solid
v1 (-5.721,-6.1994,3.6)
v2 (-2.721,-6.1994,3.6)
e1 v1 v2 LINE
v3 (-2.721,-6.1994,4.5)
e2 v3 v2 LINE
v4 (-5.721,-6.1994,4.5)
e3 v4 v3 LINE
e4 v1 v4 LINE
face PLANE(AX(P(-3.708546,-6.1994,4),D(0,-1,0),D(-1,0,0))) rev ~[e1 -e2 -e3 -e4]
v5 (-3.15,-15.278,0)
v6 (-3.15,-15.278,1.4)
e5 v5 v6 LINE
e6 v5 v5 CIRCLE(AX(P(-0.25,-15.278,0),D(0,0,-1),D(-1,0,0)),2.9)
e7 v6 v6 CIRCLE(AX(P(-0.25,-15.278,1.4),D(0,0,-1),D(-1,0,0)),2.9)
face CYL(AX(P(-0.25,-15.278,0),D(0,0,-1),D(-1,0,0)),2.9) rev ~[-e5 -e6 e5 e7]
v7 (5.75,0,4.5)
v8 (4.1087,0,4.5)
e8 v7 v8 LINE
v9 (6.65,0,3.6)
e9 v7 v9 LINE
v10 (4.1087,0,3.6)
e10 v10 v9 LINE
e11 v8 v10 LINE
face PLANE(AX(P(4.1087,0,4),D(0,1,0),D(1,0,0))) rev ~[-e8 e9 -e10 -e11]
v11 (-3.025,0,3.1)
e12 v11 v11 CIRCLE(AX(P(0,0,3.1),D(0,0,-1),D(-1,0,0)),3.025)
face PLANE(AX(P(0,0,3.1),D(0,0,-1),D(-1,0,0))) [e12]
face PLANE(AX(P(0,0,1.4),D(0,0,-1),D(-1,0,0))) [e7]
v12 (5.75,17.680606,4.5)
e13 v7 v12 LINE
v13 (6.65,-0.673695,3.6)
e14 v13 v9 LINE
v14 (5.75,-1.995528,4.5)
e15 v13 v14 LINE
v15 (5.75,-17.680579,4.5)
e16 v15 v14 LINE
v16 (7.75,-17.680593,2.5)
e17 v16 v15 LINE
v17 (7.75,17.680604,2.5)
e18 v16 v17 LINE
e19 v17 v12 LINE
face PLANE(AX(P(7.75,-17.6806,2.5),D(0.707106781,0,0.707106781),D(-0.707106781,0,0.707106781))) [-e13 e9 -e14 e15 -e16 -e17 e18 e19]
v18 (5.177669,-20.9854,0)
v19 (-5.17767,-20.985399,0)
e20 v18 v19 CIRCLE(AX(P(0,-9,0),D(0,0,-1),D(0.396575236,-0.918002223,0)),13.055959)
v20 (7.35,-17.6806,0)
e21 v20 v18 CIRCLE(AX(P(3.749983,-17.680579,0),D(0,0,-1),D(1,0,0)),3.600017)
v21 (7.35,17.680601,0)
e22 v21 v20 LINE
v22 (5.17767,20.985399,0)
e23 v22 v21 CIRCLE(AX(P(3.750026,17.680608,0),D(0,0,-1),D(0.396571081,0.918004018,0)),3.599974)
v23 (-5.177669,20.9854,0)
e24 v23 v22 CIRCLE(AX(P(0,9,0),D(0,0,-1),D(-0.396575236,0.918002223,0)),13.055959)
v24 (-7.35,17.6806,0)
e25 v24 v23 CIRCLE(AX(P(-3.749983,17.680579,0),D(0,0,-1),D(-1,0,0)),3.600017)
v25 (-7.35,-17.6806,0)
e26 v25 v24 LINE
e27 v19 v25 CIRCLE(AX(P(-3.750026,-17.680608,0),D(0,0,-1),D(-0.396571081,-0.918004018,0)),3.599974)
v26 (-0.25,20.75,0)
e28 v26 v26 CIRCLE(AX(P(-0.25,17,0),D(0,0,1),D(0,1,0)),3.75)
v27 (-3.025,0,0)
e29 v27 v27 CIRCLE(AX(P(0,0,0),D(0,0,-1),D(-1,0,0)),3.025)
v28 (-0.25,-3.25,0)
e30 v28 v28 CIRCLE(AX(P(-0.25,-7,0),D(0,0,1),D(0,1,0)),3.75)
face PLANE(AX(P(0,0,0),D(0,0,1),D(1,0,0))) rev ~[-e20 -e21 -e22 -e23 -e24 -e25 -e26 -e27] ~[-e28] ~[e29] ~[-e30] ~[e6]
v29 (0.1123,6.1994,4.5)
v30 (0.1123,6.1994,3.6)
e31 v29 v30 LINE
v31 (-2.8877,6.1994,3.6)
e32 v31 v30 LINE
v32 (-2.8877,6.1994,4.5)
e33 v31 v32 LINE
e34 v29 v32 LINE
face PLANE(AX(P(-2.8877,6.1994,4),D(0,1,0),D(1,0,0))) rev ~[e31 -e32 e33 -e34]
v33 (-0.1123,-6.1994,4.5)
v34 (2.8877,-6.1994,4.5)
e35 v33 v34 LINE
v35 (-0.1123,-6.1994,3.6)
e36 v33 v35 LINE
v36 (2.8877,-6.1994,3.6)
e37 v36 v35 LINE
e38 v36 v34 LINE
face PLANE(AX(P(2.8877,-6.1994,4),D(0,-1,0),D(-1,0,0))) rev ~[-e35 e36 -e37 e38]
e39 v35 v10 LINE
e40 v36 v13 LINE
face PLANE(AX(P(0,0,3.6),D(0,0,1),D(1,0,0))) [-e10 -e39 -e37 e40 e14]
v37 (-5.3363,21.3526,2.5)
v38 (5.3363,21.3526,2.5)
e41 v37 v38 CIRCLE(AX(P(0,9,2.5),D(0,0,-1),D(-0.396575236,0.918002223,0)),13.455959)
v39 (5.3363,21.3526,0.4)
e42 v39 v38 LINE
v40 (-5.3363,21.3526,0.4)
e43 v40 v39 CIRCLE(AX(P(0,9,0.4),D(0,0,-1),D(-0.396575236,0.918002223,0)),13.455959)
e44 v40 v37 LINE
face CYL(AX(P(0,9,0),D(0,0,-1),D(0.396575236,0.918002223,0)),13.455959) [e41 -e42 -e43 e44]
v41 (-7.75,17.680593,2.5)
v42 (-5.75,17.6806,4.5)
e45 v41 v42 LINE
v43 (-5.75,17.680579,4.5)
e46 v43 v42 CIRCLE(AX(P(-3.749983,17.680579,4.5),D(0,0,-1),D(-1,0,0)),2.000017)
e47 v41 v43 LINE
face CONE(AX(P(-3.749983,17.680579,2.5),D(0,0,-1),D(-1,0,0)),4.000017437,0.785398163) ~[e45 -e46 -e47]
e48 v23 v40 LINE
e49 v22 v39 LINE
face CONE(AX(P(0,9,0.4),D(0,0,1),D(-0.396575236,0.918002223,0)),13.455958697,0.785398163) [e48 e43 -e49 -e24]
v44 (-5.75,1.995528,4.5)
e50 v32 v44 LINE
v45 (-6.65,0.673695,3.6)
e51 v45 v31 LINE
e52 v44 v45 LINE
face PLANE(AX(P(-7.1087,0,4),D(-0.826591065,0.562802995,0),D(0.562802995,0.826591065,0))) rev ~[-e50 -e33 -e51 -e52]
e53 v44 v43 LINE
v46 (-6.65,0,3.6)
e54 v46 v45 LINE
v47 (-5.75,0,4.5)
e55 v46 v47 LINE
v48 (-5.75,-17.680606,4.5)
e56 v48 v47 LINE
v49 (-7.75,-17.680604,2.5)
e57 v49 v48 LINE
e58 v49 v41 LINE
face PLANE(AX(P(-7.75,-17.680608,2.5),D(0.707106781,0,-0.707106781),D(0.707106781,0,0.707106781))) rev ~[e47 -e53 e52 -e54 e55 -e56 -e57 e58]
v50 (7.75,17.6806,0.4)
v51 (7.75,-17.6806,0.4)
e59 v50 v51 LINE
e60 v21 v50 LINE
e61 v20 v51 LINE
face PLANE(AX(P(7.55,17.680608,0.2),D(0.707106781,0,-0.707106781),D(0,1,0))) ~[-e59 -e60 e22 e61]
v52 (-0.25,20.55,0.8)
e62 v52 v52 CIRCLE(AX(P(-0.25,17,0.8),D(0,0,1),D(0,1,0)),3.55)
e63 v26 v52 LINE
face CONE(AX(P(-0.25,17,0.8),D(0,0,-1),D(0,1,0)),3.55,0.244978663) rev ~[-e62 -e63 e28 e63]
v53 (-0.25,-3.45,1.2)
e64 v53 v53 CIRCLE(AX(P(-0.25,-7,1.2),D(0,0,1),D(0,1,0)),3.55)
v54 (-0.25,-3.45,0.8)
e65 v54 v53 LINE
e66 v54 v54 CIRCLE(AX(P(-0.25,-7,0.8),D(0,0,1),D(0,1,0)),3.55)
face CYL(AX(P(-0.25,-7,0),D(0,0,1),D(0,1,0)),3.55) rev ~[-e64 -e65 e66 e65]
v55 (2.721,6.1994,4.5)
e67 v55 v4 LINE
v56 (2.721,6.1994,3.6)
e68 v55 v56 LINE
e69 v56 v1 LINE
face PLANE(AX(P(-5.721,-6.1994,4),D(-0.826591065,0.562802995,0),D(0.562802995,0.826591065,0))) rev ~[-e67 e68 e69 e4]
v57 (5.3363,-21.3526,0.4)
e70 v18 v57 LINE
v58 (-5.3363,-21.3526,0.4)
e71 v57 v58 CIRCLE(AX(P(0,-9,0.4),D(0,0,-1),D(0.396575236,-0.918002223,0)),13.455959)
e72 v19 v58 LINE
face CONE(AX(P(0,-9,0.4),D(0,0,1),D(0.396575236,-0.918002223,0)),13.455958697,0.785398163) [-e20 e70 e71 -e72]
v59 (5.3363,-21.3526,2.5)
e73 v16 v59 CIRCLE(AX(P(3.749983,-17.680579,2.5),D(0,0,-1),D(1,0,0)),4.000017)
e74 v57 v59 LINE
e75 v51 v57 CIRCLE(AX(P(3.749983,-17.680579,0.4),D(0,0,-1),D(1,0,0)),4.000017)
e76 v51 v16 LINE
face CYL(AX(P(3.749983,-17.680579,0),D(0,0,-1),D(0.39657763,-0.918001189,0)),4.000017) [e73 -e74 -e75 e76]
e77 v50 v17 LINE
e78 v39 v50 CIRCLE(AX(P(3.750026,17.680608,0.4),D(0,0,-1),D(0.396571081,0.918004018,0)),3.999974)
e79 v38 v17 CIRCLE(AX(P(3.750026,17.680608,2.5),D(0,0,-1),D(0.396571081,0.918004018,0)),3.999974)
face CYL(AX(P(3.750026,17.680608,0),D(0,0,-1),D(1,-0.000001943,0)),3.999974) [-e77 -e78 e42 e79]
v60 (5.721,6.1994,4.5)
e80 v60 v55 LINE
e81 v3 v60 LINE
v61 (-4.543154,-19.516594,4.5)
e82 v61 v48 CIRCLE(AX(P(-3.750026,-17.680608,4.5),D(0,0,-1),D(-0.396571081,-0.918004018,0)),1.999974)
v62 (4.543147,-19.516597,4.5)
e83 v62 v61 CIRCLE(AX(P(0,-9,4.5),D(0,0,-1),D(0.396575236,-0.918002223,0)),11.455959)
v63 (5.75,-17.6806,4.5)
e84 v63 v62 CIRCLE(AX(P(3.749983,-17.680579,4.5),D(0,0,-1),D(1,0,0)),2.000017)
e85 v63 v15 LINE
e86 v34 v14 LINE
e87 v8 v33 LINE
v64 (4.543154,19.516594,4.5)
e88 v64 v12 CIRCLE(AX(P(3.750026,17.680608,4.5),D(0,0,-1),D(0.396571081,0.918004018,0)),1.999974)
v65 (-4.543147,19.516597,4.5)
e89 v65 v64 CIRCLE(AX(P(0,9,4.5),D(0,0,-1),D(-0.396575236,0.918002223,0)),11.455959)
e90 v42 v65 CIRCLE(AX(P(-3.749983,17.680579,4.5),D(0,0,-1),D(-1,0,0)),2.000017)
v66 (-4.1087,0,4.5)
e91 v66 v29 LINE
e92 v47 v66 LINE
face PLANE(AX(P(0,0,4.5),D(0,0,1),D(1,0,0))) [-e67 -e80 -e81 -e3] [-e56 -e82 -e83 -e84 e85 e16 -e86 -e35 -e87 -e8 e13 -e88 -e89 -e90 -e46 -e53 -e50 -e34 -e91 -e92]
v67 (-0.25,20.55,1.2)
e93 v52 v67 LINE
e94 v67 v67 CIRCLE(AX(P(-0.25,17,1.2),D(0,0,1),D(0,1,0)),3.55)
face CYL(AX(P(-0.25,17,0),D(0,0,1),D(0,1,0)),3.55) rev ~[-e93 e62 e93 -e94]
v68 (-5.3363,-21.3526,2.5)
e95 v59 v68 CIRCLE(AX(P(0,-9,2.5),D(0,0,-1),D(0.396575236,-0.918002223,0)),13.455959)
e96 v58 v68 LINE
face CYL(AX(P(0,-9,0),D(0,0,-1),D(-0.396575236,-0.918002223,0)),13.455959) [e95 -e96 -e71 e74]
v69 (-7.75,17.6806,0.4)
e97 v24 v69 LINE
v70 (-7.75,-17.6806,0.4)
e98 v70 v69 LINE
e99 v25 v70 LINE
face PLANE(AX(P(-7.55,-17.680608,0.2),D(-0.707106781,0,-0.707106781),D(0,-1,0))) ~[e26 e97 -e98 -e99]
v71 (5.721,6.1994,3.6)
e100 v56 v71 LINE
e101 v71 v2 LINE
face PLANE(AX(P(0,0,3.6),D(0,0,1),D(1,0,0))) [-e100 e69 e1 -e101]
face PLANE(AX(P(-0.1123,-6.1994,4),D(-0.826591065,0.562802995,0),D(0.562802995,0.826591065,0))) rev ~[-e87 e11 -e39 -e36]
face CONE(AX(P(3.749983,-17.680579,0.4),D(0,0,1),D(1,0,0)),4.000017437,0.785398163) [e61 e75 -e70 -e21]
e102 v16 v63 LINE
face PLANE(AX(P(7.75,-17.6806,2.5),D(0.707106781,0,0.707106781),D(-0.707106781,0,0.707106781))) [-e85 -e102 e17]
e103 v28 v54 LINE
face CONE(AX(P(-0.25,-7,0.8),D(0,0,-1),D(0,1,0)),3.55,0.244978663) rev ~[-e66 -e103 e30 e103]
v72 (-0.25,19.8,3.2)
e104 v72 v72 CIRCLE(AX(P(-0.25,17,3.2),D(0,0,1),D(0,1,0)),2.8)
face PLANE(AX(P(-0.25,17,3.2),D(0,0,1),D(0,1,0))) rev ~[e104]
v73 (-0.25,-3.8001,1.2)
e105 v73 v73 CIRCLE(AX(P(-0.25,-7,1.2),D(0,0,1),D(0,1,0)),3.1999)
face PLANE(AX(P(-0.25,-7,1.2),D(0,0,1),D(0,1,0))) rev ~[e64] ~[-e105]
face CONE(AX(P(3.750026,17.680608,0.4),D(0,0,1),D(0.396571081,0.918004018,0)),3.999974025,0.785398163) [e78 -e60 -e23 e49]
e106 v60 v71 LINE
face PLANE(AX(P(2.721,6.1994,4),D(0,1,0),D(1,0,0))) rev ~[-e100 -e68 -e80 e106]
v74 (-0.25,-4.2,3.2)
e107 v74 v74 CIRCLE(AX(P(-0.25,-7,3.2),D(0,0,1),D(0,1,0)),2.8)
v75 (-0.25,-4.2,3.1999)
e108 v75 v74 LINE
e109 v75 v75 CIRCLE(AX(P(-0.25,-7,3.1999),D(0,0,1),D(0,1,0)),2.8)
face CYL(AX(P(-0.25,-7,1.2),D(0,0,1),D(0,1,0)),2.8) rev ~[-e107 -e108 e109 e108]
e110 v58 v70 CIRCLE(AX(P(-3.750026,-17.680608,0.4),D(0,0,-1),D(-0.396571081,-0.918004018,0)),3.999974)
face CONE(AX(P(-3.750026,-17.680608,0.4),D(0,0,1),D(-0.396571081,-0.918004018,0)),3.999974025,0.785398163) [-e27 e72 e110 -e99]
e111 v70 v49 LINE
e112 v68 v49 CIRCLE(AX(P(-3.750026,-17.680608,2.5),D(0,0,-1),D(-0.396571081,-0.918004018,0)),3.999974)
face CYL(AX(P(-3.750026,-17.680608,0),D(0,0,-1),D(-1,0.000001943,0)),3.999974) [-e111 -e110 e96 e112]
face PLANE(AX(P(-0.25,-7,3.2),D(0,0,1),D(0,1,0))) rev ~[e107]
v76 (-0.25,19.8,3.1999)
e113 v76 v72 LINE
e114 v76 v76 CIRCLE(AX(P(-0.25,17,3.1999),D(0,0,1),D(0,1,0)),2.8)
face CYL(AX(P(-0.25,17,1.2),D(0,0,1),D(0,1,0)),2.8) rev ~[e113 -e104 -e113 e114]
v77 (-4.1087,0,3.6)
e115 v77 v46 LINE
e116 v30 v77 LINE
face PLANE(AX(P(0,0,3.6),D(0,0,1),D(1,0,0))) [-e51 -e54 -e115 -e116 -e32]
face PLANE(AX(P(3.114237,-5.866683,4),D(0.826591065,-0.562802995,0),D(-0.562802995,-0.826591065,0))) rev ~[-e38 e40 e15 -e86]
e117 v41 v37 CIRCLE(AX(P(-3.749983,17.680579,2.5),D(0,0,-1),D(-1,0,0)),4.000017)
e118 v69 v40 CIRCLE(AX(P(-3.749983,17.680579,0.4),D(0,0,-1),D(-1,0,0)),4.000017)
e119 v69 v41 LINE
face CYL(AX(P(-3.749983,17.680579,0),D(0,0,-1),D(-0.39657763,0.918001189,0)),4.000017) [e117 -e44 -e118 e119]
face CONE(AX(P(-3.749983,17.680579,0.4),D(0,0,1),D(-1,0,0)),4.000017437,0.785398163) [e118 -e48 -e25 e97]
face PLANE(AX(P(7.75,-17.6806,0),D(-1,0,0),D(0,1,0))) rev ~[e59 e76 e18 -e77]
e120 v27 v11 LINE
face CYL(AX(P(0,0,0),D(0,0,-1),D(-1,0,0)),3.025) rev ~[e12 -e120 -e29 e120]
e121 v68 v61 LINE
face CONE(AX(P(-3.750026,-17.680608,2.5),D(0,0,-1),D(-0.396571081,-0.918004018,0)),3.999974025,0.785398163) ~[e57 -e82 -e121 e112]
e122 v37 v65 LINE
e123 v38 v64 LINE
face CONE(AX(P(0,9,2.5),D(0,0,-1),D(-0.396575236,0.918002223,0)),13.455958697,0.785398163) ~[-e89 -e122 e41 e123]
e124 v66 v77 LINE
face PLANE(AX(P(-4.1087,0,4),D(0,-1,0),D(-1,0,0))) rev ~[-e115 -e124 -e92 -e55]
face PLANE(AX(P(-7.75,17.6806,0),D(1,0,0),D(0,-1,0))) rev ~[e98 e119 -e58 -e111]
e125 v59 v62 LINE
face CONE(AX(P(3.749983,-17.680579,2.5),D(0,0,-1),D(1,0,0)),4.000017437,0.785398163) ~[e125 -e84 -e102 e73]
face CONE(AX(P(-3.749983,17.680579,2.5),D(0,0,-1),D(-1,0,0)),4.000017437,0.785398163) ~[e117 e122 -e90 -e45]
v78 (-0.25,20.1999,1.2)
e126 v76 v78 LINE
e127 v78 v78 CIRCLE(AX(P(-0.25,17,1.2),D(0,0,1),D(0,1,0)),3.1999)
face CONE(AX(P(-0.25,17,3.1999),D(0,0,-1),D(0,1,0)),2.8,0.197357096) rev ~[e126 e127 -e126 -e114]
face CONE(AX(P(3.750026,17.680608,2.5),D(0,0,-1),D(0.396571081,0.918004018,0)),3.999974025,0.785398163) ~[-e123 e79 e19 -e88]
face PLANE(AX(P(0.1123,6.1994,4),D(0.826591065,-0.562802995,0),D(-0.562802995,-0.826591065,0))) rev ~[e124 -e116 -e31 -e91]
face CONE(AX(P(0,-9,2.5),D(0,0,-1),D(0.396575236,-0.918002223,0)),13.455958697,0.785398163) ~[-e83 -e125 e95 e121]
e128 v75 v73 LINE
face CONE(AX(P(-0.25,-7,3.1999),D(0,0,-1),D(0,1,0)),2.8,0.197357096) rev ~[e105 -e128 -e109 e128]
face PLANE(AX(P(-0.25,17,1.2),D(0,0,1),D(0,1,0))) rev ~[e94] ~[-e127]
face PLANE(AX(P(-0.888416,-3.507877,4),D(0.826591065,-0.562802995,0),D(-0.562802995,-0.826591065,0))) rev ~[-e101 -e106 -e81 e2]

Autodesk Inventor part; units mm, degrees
ref_plane "YZ Plane" through (0, 0, 0) normal (1, 0, 0) x (0, 1, 0)
ref_plane "XZ Plane" through (0, 0, 0) normal (0, 1, 0) x (-1, 0, 0)
ref_plane "XY Plane" through (0, 0, 0) normal (0, 0, 1) x (1, 0, 0)
sketch "Skizze1" plane through (0, 0, 0) normal (0, 0, 1) x (1, 0, 0)
  line L0 (7.75, -17.6806) -> (7.75, 17.6806) projected
  line L1 (-7.75, 17.6806) -> (-7.75, -17.6806) projected
  circle A0 centre (0, 0) radius 3.025 projected
  arc A1 (-5.3363, -21.3526) -> (5.3363, -21.3526) centre (0, -9) ccw projected
  arc A2 (5.3363, -21.3526) -> (7.75, -17.6806) centre (3.75, -17.6806) ccw projected
  arc A3 (7.75, 17.6806) -> (5.3363, 21.3526) centre (3.75, 17.6806) ccw projected
  arc A4 (5.3363, 21.3526) -> (-5.3363, 21.3526) centre (0, 9) ccw projected
  arc A5 (-5.3363, 21.3526) -> (-7.75, 17.6806) centre (-3.75, 17.6806) ccw projected
  arc A6 (-7.75, -17.6806) -> (-5.3363, -21.3526) centre (-3.75, -17.6806) ccw projected
  circle A7 centre (-0.25, 17) radius 1.7 projected
  circle A8 centre (-0.25, -7) radius 1.7 projected
  line L2 (5.34, 14.1) -> (3.3, 14.1) projected
  line L3 (3.3, 14.1) -> (3.3, 17.74) projected
  line L4 (3.3, 17.74) -> (5.34, 17.74) projected
  line L5 (5.34, 17.74) -> (5.34, 14.1) projected
  line L6 (-3.8, 14.1) -> (-5.84, 14.1) projected
  line L7 (-5.84, 14.1) -> (-5.84, 17.74) projected
  line L8 (-5.84, 17.74) -> (-3.8, 17.74) projected
  line L9 (-3.8, 17.74) -> (-3.8, 14.1) projected
  circle A9 centre (-0.25, -15.278) radius 2.9 projected
  point P0 (0, 0)
  point P1 (-17.1225, -5.975)
  point P2 (-17.1225, -12.025)
  point P3 (-17.1225, 6.3)
  point P4 (-17.1225, -14.3)
  point P5 (-17.1225, -17.7)
extrude "Extrusion1" add sketch "Skizze1" along normal blind 4 contours A2 A1 A6 L1 A5 A4 A3 L0 | A0 | A7 | A8 | L2 L3 L4 L5 | L6 L7 L8 L9 | A9
sketch "Skizze2" plane through (0, 0, 0) normal (0, 0, -1) x (-1, 0, 0)
  circle A0 centre (0, 0) radius 3.025 projected
  arc A1 (-5.3363, -21.3526) -> (5.3363, -21.3526) centre (0, -9) ccw projected
  arc A2 (-7.75, -17.6806) -> (-5.3363, -21.3526) centre (-3.75, -17.6806) ccw projected
  line L0 (-7.75, -17.6806) -> (-7.75, 17.6806) projected
  arc A3 (-5.3363, 21.3526) -> (-7.75, 17.6806) centre (-3.75, 17.6806) ccw projected
  arc A4 (5.3363, 21.3526) -> (-5.3363, 21.3526) centre (0, 9) ccw projected
  arc A5 (7.75, 17.6806) -> (5.3363, 21.3526) centre (3.75, 17.6806) ccw projected
  line L1 (7.75, 17.6806) -> (7.75, -17.6806) projected
  arc A6 (5.3363, -21.3526) -> (7.75, -17.6806) centre (3.75, -17.6806) ccw projected
  circle A7 centre (0.25, 17) radius 1.7 projected
  circle A8 centre (0.25, -7) radius 1.7 projected
  line L2 (-5.34, 14.1) -> (-3.3, 14.1) projected
  line L3 (-3.3, 14.1) -> (-3.3, 17.74) projected
  line L4 (-3.3, 17.74) -> (-5.34, 17.74) projected
  line L5 (-5.34, 17.74) -> (-5.34, 14.1) projected
  line L6 (3.8, 14.1) -> (5.84, 14.1) projected
  line L7 (5.84, 14.1) -> (5.84, 17.74) projected
  line L8 (5.84, 17.74) -> (3.8, 17.74) projected
  line L9 (3.8, 17.74) -> (3.8, 14.1) projected
  circle A9 centre (0.25, -15.278) radius 2.9 projected
  point P0 (0, 0)
extrude "Extrusion2" cut sketch "Skizze2" against normal blind 3.1 contours A0
sketch "Skizze3" plane through (0, 0, 0) normal (0, 0, -1) x (-1, 0, 0)
  circle A0 centre (0, 0) radius 3.025 projected
  arc A1 (-5.3363, -21.3526) -> (5.3363, -21.3526) centre (0, -9) ccw projected
  arc A2 (-7.75, -17.6806) -> (-5.3363, -21.3526) centre (-3.75, -17.6806) ccw projected
  line L0 (-7.75, -17.6806) -> (-7.75, 17.6806) projected
  arc A3 (-5.3363, 21.3526) -> (-7.75, 17.6806) centre (-3.75, 17.6806) ccw projected
  arc A4 (5.3363, 21.3526) -> (-5.3363, 21.3526) centre (0, 9) ccw projected
  arc A5 (7.75, 17.6806) -> (5.3363, 21.3526) centre (3.75, 17.6806) ccw projected
  line L1 (7.75, 17.6806) -> (7.75, -17.6806) projected
  arc A6 (5.3363, -21.3526) -> (7.75, -17.6806) centre (3.75, -17.6806) ccw projected
  circle A7 centre (0.25, 17) radius 1.7 projected
  circle A8 centre (0.25, -7) radius 1.7 projected
  line L2 (-5.34, 14.1) -> (-3.3, 14.1) projected
  line L3 (-3.3, 14.1) -> (-3.3, 17.74) projected
  line L4 (-3.3, 17.74) -> (-5.34, 17.74) projected
  line L5 (-5.34, 17.74) -> (-5.34, 14.1) projected
  line L6 (3.8, 14.1) -> (5.84, 14.1) projected
  line L7 (5.84, 14.1) -> (5.84, 17.74) projected
  line L8 (5.84, 17.74) -> (3.8, 17.74) projected
  line L9 (3.8, 17.74) -> (3.8, 14.1) projected
  circle A9 centre (0.25, -15.278) radius 2.9 projected
  point P0 (0, 0)
hole "Bohrung1" at (-0.25, 17, 0) at (-0.25, -7, 0) direction (0, 0, 1) diameter 5.6 depth 3.2 counterbore diameter 7.1 counterbore depth 1.2
sketch "Skizze4" plane through (0, 0, 4) normal (0, 0, 1) x (1, 0, 0)
  circle A0 centre (-0.25, 17) radius 3.55 projected
  circle A1 centre (-0.25, -7) radius 3.55 projected
  circle A2 centre (0, 0) radius 3.025 projected
  arc A3 (5.3363, -21.3526) -> (7.75, -17.6806) centre (3.75, -17.6806) ccw projected
  arc A4 (-5.3363, -21.3526) -> (5.3363, -21.3526) centre (0, -9) ccw projected
  arc A5 (-7.75, -17.6806) -> (-5.3363, -21.3526) centre (-3.75, -17.6806) ccw projected
  line L0 (-7.75, 17.6806) -> (-7.75, -17.6806) projected
  arc A6 (-5.3363, 21.3526) -> (-7.75, 17.6806) centre (-3.75, 17.6806) ccw projected
  arc A7 (5.3363, 21.3526) -> (-5.3363, 21.3526) centre (0, 9) ccw projected
  arc A8 (7.75, 17.6806) -> (5.3363, 21.3526) centre (3.75, 17.6806) ccw projected
  line L1 (7.75, -17.6806) -> (7.75, 17.6806) projected
  circle A9 centre (12.6079, -10) radius 2.8
  circle A10 centre (12.6079, -10) radius 2.8
  line L2 (4.1087, 0) -> (7.1087, 0)
  line L3 (7.1087, 0) -> (2.8877, -6.1994)
  line L4 (2.8877, -6.1994) -> (-0.1123, -6.1994)
  line L5 (-0.1123, -6.1994) -> (4.1087, 0)
  line L6 (2.721, 6.1994) -> (5.721, 6.1994)
  line L7 (5.721, 6.1994) -> (-2.721, -6.1994)
  line L8 (-2.721, -6.1994) -> (-5.721, -6.1994)
  line L9 (-5.721, -6.1994) -> (2.721, 6.1994)
  line L10 (-2.8877, 6.1994) -> (0.1123, 6.1994)
  line L11 (0.1123, 6.1994) -> (-4.1087, 0)
  line L12 (-4.1087, 0) -> (-7.1087, 0)
  line L13 (-7.1087, 0) -> (-2.8877, 6.1994)
  line L14 (7.1087, 6.1994) -> (7.1087, -6.1994)
  line L15 (7.1087, -6.1994) -> (-7.1087, -6.1994)
  line L16 (-7.1087, -6.1994) -> (-7.1087, 6.1994)
  line L17 (-7.1087, 6.1994) -> (7.1087, 6.1994)
  point P0 (0, 0)
  point P1 (16.5579, -10)
  point P2 (16.5579, -10)
  point P3 (16.5579, -10)
  point P4 (50.5428, -9.282)
  point P5 (-4.221, -6.1994)
  point P6 (4.221, 6.1994)
  point P7 (-1.3877, 6.1994)
  point P8 (1.3877, -6.1994)
  dimension "d89" = 5.6
  dimension "d104" = 5.6
  dimension "d107" = 14.2174
  dimension "d108" = 12.3988
  dimension "d109" = 2.1563
  dimension "d110" = 2.1563
  dimension "d111" = 2.4798
  dimension "d112" = 2.4798
  dimension "d113" = 2.4798
  dimension "d114" = 6.1994
  dimension "d115" = 6.1994
  dimension "d116" = 6.1994
  dimension "d117" = 15.5
  dimension "d118" = 0.6413
move faces "Verschieben1" translate (0, 0, 0.5) faces at (-2.5833, -5.8935, 4)
extrude "Extrusion4" cut sketch "Skizze4" along normal mid plane 0.8 contours L8 L9 A2 L7 A1 | A1 L7 L8 | L3 L4 L5 A1 | A1 L5 L2 L3 | A2 L9 L7 | A2 L9 L6 L7 | L13 L10 L11 L12
extrude "Extrusion5" cut sketch "Skizze4" along normal through all contours L8 L9 A2 L7 A1 | A1 L7 L8 | L3 L4 L5 A1 | A1 L5 L2 L3 | A2 L9 L7 | A2 L9 L6 L7 | L13 L10 L11 L12
sketch "Skizze5" plane through (0, 0, 0) normal (0, 0, -1) x (-1, 0, 0)
  circle A0 centre (0.25, -15.278) radius 2.9 projected
  point P0 (0, 0)
extrude "Extrusion6" cut sketch "Skizze5" against normal blind 1.4
chamfer "Fase2" distance 0.2 distance2 0.8 1 edges at (-0.25, -10.55, 0) measured on face at (6.175, 0, 0)
chamfer "Fase3" distance 2 distance2 0.4 1 edges at (-0.25, -9.8, 1.2) measured on face at (0.1992, -4.2363, 2.5333)
chamfer "Fase4" distance 2 distance2 0.4 1 edges at (-0.25, 14.2, 1.2) measured on face at (0.1992, 19.7637, 2.5333)
chamfer "Fase5" distance 0.2 distance2 0.8 1 edges at (-0.25, 13.45, 0) measured on face at (6.175, 0, 0)
chamfer "Fase6" distance 0.4 angle 45 8 edges at (-7.75, 0, 0) (-7.0925, -19.8777, 0) (0, -22.4559, 0) (7.0925, -19.8777, 0) (7.75, 0, 0) (7.0925, 19.8777, 0) (0, 22.4559, 0) (-7.0925, 19.8777, 0)
chamfer "Fase7" distance 2 angle 45 8 edges at (7.75, 0, 4.5) (7.0925, 19.8777, 4.5) (0, 22.4559, 4.5) (-7.0925, 19.8777, 4.5) (-7.75, 0, 4.5) (-7.0925, -19.8777, 4.5) (0, -22.4559, 4.5) (7.0925, -19.8777, 4.5)
properties part number "Cover_Angled"
